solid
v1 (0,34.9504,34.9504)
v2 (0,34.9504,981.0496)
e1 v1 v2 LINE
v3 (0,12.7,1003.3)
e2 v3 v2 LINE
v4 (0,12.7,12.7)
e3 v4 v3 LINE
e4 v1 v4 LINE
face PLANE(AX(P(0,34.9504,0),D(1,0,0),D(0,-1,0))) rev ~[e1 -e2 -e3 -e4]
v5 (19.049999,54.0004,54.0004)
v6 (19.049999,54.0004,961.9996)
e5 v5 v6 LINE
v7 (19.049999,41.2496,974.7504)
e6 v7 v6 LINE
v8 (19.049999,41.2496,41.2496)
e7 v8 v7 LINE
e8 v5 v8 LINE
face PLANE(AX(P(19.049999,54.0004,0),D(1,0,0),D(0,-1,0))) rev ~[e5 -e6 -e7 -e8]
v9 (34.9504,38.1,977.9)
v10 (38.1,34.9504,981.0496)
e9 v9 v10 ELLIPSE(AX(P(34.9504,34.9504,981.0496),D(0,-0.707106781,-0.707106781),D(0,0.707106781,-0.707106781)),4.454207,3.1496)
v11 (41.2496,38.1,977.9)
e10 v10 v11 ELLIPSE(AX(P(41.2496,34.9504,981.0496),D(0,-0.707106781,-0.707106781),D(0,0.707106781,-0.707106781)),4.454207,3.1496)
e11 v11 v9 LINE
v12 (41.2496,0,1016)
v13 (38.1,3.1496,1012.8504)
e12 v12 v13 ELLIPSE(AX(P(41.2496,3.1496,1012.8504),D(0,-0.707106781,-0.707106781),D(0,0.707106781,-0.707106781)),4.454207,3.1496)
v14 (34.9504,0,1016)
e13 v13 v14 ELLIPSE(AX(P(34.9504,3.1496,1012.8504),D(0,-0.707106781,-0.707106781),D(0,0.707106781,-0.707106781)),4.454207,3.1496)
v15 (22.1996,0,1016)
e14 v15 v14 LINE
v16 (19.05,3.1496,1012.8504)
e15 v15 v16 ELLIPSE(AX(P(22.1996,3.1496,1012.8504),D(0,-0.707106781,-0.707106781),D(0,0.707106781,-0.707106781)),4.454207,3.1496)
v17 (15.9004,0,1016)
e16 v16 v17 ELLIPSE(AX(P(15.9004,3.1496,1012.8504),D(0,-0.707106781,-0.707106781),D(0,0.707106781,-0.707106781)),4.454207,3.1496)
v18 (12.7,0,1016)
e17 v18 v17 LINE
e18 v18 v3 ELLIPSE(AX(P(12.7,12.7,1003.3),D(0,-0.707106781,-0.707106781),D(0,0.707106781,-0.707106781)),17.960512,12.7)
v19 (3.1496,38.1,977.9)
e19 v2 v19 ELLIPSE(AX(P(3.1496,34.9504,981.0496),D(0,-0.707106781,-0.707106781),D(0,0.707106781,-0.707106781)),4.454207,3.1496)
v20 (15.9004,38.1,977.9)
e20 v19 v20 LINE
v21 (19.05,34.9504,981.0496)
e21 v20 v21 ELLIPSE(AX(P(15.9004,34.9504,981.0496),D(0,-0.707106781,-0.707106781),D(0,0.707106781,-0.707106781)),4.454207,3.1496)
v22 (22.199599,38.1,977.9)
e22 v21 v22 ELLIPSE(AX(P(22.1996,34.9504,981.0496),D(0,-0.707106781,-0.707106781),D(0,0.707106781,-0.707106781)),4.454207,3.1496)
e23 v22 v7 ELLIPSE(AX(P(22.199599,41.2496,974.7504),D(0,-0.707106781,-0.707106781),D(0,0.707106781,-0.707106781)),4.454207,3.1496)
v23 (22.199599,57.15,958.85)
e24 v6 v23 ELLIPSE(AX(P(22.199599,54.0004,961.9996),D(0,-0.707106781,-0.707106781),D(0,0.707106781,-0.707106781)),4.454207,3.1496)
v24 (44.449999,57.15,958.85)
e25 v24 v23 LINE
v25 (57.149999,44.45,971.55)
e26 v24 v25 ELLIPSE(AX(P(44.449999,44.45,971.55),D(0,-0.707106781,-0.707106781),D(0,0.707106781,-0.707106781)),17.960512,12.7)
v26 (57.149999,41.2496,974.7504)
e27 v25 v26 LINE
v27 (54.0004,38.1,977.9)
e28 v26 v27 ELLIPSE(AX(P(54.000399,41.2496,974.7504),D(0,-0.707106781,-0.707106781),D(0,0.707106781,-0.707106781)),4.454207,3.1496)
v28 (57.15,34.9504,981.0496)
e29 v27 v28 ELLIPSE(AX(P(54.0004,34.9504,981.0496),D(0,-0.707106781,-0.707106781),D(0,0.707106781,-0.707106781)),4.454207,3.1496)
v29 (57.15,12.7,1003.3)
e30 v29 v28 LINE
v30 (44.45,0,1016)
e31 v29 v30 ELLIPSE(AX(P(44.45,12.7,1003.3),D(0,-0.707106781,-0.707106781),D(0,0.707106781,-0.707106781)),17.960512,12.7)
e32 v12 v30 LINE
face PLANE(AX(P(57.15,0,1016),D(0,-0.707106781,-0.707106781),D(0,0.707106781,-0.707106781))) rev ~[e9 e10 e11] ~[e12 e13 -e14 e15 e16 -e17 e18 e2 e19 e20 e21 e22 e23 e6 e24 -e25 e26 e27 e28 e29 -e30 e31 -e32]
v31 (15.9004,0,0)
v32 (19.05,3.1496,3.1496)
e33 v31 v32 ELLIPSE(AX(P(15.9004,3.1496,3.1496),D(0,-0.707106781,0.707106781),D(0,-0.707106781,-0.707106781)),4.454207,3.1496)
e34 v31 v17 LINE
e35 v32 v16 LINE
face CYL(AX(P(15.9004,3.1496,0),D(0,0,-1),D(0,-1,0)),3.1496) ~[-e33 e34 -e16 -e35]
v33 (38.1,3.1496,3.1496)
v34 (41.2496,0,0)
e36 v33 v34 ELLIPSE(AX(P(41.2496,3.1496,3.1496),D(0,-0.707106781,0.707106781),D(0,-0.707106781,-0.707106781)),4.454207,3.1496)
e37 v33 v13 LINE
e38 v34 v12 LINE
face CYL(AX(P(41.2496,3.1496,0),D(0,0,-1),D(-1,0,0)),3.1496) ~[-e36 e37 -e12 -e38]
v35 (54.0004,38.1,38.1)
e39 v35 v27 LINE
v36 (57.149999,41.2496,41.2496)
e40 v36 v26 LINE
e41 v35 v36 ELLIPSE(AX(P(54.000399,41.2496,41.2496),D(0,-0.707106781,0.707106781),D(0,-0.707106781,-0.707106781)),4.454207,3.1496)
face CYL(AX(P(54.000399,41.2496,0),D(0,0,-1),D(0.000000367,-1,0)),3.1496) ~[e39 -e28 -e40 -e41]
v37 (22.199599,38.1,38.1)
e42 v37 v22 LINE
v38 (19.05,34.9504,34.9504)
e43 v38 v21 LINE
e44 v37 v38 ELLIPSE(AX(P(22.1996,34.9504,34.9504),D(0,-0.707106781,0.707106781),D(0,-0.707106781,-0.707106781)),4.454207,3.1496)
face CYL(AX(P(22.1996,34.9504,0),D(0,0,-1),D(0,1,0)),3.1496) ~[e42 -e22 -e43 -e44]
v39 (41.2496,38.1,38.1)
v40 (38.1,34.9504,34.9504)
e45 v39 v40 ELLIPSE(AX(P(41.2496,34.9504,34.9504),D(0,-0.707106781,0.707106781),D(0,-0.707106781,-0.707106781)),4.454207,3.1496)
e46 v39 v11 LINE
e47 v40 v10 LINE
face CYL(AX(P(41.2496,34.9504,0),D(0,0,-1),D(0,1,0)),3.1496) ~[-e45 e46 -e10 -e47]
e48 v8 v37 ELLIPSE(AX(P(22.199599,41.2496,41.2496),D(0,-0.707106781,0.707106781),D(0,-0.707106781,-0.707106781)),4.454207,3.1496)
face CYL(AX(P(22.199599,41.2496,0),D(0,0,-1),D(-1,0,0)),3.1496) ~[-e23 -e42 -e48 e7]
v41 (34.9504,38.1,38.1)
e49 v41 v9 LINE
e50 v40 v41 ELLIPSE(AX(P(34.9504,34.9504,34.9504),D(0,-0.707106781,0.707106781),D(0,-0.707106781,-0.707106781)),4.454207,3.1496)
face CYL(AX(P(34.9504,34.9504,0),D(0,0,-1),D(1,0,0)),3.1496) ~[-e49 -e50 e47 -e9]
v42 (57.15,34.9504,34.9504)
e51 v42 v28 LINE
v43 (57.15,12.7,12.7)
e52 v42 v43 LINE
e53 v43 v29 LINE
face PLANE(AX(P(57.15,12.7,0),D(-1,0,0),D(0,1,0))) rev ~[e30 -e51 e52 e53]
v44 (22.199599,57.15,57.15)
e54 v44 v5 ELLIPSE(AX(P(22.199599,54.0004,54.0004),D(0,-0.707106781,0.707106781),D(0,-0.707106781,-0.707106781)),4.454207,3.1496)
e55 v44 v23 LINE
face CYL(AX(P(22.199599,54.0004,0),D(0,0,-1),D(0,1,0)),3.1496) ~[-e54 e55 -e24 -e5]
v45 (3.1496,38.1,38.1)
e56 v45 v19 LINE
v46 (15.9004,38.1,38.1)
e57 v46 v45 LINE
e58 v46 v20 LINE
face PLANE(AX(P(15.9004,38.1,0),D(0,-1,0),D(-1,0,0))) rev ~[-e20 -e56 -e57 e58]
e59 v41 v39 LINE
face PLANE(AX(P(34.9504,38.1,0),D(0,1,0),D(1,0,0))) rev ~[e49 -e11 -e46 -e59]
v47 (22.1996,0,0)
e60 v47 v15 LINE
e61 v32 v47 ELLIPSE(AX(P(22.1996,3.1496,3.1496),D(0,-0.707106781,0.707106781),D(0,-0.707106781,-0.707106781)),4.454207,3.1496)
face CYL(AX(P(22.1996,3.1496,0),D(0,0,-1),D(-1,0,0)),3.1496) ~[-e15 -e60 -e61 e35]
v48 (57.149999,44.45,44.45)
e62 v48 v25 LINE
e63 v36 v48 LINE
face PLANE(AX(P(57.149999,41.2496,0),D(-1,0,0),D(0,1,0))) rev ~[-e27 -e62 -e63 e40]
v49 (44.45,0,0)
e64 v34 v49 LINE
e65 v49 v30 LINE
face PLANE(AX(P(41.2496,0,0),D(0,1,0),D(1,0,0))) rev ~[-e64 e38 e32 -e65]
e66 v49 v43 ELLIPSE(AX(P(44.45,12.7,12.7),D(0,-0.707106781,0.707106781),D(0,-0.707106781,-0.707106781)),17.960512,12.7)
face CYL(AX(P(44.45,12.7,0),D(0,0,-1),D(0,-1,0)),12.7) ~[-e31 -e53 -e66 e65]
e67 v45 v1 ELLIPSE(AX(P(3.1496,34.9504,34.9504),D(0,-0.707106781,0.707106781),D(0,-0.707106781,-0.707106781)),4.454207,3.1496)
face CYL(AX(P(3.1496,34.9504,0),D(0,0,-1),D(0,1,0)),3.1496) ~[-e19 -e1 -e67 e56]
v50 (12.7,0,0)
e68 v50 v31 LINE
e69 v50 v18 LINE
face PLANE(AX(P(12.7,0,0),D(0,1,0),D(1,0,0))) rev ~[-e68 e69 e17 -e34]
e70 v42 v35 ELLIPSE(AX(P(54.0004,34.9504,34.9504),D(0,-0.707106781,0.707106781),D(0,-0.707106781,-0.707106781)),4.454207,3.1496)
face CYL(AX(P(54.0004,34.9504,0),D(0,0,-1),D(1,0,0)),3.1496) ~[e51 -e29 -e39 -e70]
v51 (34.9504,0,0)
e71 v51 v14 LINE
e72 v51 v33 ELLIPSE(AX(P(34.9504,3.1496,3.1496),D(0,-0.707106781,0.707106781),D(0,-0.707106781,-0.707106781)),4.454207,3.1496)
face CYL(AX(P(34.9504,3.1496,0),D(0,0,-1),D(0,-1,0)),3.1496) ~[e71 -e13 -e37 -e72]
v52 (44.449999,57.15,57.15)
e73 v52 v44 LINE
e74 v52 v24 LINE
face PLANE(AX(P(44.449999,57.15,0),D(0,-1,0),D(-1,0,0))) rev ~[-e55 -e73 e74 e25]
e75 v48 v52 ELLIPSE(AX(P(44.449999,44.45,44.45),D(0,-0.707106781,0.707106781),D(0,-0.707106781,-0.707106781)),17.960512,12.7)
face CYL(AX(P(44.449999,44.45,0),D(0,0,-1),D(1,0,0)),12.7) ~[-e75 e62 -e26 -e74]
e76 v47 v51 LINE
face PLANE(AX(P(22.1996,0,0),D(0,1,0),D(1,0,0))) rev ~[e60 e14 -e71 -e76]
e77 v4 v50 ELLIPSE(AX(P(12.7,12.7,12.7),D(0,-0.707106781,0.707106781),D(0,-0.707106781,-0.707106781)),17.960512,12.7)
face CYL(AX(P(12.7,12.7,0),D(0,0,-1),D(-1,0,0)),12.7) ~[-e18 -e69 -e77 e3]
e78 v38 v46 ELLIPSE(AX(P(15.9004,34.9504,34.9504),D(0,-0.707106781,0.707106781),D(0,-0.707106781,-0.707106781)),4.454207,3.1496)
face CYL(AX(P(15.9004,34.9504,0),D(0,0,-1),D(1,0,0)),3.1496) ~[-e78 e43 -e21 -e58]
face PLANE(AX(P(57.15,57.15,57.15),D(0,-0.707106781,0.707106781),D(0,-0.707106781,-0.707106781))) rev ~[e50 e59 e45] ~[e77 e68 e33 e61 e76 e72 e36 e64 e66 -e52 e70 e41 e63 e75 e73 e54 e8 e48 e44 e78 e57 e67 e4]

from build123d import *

# Parameters (mm, degrees)
F1_DEPTH = 1016
F3_DEPTH = 57.151


# Not quite as in the source:
# - ends of sketch curves that miss each other by under 0.0002 mm in the source are joined


with BuildPart() as f1:
    # F0 (on Top) → F1 (new body)
    with BuildSketch(Plane.XY):
        with BuildLine():
            ThreePointArc((0, 12.7), (3.7197438789, 3.7197438789), (12.7, 0))
            Line((12.7, 0), (15.9004, 0))
            ThreePointArc((15.9004, 0), (18.127503518, 0.922496482), (19.05, 3.1496))
            Line((19.05, 3.1496), (19.05, 34.9504))
            ThreePointArc((19.05, 34.9504), (18.127503518, 37.177503518), (15.9004, 38.1))
            Line((15.9004, 38.1), (3.1496, 38.1))
            ThreePointArc((3.1496, 38.1), (0.922496482, 37.177503518), (0, 34.9504))
            Line((0, 34.9504), (0, 12.7))
        make_face()
        with BuildLine():
            Line((19.05, 34.9504), (19.05, 3.1496))
            ThreePointArc((19.05, 3.1496), (19.972496482, 0.922496482), (22.1996, 0))
            Line((22.1996, 0), (34.9504, 0))
            ThreePointArc((34.9504, 0), (37.177503518, 0.922496482), (38.1, 3.1496))
            Line((38.1, 3.1496), (38.1, 34.9504))
            ThreePointArc((38.1, 34.9504), (37.177503518, 37.177503518), (34.9504, 38.1))
            Line((34.9504, 38.1), (22.1996, 38.1))
            ThreePointArc((22.1996, 38.1), (19.972496482, 37.177503518), (19.05, 34.9504))
        make_face()
        with BuildLine():
            Line((38.1, 34.9504), (38.1, 3.1496))
            ThreePointArc((38.1, 3.1496), (39.022496482, 0.922496482), (41.2496, 0))
            Line((41.2496, 0), (44.45, 0))
            ThreePointArc((44.45, 0), (53.4302561211, 3.7197438789), (57.15, 12.7))
            Line((57.15, 12.7), (57.15, 34.9504))
            ThreePointArc((57.15, 34.9504), (56.227503518, 37.177503518), (54.0004, 38.1))
            Line((54.0004, 38.1), (41.2496, 38.1))
            ThreePointArc((41.2496, 38.1), (39.022496482, 37.177503518), (38.1, 34.9504))
        make_face()
        with BuildLine():
            ThreePointArc((19.0499988437, 41.2496), (19.9724953256, 39.022496482), (22.1995988437, 38.1))
            Line((22.1995988437, 38.1), (34.9504, 38.1))
            Line((34.9504, 38.1), (41.2496, 38.1))
            Line((41.2496, 38.1), (54.0004, 38.1))
            ThreePointArc((54.0004, 38.1), (56.2275023617, 39.022496482), (57.1499988437, 41.2496))
            Line((57.1499988437, 41.2496), (57.1499988437, 44.45))
            ThreePointArc((57.1499988437, 44.45), (53.4302549647, 53.4302561211), (44.4499988437, 57.15))
            Line((44.4499988437, 57.15), (22.1995988437, 57.15))
            ThreePointArc((22.1995988437, 57.15), (19.9724953256, 56.227503518), (19.0499988437, 54.0004))
            Line((19.0499988437, 54.0004), (19.0499988437, 41.2496))
        make_face()
    extrude(amount=F1_DEPTH)

    # F2 (on face) → F3 (cut, through all)
    with BuildSketch(Plane.YZ.offset(57.15)):
        Polygon((57.15, 0), (57.15, 57.15), (0, 0), (12.7, 0), align=None)
        Polygon((12.7, 1016), (0, 1016), (57.15, 958.85), (57.15, 1016), align=None)
    extrude(amount=-F3_DEPTH, mode=Mode.SUBTRACT)


solid = f1.part
